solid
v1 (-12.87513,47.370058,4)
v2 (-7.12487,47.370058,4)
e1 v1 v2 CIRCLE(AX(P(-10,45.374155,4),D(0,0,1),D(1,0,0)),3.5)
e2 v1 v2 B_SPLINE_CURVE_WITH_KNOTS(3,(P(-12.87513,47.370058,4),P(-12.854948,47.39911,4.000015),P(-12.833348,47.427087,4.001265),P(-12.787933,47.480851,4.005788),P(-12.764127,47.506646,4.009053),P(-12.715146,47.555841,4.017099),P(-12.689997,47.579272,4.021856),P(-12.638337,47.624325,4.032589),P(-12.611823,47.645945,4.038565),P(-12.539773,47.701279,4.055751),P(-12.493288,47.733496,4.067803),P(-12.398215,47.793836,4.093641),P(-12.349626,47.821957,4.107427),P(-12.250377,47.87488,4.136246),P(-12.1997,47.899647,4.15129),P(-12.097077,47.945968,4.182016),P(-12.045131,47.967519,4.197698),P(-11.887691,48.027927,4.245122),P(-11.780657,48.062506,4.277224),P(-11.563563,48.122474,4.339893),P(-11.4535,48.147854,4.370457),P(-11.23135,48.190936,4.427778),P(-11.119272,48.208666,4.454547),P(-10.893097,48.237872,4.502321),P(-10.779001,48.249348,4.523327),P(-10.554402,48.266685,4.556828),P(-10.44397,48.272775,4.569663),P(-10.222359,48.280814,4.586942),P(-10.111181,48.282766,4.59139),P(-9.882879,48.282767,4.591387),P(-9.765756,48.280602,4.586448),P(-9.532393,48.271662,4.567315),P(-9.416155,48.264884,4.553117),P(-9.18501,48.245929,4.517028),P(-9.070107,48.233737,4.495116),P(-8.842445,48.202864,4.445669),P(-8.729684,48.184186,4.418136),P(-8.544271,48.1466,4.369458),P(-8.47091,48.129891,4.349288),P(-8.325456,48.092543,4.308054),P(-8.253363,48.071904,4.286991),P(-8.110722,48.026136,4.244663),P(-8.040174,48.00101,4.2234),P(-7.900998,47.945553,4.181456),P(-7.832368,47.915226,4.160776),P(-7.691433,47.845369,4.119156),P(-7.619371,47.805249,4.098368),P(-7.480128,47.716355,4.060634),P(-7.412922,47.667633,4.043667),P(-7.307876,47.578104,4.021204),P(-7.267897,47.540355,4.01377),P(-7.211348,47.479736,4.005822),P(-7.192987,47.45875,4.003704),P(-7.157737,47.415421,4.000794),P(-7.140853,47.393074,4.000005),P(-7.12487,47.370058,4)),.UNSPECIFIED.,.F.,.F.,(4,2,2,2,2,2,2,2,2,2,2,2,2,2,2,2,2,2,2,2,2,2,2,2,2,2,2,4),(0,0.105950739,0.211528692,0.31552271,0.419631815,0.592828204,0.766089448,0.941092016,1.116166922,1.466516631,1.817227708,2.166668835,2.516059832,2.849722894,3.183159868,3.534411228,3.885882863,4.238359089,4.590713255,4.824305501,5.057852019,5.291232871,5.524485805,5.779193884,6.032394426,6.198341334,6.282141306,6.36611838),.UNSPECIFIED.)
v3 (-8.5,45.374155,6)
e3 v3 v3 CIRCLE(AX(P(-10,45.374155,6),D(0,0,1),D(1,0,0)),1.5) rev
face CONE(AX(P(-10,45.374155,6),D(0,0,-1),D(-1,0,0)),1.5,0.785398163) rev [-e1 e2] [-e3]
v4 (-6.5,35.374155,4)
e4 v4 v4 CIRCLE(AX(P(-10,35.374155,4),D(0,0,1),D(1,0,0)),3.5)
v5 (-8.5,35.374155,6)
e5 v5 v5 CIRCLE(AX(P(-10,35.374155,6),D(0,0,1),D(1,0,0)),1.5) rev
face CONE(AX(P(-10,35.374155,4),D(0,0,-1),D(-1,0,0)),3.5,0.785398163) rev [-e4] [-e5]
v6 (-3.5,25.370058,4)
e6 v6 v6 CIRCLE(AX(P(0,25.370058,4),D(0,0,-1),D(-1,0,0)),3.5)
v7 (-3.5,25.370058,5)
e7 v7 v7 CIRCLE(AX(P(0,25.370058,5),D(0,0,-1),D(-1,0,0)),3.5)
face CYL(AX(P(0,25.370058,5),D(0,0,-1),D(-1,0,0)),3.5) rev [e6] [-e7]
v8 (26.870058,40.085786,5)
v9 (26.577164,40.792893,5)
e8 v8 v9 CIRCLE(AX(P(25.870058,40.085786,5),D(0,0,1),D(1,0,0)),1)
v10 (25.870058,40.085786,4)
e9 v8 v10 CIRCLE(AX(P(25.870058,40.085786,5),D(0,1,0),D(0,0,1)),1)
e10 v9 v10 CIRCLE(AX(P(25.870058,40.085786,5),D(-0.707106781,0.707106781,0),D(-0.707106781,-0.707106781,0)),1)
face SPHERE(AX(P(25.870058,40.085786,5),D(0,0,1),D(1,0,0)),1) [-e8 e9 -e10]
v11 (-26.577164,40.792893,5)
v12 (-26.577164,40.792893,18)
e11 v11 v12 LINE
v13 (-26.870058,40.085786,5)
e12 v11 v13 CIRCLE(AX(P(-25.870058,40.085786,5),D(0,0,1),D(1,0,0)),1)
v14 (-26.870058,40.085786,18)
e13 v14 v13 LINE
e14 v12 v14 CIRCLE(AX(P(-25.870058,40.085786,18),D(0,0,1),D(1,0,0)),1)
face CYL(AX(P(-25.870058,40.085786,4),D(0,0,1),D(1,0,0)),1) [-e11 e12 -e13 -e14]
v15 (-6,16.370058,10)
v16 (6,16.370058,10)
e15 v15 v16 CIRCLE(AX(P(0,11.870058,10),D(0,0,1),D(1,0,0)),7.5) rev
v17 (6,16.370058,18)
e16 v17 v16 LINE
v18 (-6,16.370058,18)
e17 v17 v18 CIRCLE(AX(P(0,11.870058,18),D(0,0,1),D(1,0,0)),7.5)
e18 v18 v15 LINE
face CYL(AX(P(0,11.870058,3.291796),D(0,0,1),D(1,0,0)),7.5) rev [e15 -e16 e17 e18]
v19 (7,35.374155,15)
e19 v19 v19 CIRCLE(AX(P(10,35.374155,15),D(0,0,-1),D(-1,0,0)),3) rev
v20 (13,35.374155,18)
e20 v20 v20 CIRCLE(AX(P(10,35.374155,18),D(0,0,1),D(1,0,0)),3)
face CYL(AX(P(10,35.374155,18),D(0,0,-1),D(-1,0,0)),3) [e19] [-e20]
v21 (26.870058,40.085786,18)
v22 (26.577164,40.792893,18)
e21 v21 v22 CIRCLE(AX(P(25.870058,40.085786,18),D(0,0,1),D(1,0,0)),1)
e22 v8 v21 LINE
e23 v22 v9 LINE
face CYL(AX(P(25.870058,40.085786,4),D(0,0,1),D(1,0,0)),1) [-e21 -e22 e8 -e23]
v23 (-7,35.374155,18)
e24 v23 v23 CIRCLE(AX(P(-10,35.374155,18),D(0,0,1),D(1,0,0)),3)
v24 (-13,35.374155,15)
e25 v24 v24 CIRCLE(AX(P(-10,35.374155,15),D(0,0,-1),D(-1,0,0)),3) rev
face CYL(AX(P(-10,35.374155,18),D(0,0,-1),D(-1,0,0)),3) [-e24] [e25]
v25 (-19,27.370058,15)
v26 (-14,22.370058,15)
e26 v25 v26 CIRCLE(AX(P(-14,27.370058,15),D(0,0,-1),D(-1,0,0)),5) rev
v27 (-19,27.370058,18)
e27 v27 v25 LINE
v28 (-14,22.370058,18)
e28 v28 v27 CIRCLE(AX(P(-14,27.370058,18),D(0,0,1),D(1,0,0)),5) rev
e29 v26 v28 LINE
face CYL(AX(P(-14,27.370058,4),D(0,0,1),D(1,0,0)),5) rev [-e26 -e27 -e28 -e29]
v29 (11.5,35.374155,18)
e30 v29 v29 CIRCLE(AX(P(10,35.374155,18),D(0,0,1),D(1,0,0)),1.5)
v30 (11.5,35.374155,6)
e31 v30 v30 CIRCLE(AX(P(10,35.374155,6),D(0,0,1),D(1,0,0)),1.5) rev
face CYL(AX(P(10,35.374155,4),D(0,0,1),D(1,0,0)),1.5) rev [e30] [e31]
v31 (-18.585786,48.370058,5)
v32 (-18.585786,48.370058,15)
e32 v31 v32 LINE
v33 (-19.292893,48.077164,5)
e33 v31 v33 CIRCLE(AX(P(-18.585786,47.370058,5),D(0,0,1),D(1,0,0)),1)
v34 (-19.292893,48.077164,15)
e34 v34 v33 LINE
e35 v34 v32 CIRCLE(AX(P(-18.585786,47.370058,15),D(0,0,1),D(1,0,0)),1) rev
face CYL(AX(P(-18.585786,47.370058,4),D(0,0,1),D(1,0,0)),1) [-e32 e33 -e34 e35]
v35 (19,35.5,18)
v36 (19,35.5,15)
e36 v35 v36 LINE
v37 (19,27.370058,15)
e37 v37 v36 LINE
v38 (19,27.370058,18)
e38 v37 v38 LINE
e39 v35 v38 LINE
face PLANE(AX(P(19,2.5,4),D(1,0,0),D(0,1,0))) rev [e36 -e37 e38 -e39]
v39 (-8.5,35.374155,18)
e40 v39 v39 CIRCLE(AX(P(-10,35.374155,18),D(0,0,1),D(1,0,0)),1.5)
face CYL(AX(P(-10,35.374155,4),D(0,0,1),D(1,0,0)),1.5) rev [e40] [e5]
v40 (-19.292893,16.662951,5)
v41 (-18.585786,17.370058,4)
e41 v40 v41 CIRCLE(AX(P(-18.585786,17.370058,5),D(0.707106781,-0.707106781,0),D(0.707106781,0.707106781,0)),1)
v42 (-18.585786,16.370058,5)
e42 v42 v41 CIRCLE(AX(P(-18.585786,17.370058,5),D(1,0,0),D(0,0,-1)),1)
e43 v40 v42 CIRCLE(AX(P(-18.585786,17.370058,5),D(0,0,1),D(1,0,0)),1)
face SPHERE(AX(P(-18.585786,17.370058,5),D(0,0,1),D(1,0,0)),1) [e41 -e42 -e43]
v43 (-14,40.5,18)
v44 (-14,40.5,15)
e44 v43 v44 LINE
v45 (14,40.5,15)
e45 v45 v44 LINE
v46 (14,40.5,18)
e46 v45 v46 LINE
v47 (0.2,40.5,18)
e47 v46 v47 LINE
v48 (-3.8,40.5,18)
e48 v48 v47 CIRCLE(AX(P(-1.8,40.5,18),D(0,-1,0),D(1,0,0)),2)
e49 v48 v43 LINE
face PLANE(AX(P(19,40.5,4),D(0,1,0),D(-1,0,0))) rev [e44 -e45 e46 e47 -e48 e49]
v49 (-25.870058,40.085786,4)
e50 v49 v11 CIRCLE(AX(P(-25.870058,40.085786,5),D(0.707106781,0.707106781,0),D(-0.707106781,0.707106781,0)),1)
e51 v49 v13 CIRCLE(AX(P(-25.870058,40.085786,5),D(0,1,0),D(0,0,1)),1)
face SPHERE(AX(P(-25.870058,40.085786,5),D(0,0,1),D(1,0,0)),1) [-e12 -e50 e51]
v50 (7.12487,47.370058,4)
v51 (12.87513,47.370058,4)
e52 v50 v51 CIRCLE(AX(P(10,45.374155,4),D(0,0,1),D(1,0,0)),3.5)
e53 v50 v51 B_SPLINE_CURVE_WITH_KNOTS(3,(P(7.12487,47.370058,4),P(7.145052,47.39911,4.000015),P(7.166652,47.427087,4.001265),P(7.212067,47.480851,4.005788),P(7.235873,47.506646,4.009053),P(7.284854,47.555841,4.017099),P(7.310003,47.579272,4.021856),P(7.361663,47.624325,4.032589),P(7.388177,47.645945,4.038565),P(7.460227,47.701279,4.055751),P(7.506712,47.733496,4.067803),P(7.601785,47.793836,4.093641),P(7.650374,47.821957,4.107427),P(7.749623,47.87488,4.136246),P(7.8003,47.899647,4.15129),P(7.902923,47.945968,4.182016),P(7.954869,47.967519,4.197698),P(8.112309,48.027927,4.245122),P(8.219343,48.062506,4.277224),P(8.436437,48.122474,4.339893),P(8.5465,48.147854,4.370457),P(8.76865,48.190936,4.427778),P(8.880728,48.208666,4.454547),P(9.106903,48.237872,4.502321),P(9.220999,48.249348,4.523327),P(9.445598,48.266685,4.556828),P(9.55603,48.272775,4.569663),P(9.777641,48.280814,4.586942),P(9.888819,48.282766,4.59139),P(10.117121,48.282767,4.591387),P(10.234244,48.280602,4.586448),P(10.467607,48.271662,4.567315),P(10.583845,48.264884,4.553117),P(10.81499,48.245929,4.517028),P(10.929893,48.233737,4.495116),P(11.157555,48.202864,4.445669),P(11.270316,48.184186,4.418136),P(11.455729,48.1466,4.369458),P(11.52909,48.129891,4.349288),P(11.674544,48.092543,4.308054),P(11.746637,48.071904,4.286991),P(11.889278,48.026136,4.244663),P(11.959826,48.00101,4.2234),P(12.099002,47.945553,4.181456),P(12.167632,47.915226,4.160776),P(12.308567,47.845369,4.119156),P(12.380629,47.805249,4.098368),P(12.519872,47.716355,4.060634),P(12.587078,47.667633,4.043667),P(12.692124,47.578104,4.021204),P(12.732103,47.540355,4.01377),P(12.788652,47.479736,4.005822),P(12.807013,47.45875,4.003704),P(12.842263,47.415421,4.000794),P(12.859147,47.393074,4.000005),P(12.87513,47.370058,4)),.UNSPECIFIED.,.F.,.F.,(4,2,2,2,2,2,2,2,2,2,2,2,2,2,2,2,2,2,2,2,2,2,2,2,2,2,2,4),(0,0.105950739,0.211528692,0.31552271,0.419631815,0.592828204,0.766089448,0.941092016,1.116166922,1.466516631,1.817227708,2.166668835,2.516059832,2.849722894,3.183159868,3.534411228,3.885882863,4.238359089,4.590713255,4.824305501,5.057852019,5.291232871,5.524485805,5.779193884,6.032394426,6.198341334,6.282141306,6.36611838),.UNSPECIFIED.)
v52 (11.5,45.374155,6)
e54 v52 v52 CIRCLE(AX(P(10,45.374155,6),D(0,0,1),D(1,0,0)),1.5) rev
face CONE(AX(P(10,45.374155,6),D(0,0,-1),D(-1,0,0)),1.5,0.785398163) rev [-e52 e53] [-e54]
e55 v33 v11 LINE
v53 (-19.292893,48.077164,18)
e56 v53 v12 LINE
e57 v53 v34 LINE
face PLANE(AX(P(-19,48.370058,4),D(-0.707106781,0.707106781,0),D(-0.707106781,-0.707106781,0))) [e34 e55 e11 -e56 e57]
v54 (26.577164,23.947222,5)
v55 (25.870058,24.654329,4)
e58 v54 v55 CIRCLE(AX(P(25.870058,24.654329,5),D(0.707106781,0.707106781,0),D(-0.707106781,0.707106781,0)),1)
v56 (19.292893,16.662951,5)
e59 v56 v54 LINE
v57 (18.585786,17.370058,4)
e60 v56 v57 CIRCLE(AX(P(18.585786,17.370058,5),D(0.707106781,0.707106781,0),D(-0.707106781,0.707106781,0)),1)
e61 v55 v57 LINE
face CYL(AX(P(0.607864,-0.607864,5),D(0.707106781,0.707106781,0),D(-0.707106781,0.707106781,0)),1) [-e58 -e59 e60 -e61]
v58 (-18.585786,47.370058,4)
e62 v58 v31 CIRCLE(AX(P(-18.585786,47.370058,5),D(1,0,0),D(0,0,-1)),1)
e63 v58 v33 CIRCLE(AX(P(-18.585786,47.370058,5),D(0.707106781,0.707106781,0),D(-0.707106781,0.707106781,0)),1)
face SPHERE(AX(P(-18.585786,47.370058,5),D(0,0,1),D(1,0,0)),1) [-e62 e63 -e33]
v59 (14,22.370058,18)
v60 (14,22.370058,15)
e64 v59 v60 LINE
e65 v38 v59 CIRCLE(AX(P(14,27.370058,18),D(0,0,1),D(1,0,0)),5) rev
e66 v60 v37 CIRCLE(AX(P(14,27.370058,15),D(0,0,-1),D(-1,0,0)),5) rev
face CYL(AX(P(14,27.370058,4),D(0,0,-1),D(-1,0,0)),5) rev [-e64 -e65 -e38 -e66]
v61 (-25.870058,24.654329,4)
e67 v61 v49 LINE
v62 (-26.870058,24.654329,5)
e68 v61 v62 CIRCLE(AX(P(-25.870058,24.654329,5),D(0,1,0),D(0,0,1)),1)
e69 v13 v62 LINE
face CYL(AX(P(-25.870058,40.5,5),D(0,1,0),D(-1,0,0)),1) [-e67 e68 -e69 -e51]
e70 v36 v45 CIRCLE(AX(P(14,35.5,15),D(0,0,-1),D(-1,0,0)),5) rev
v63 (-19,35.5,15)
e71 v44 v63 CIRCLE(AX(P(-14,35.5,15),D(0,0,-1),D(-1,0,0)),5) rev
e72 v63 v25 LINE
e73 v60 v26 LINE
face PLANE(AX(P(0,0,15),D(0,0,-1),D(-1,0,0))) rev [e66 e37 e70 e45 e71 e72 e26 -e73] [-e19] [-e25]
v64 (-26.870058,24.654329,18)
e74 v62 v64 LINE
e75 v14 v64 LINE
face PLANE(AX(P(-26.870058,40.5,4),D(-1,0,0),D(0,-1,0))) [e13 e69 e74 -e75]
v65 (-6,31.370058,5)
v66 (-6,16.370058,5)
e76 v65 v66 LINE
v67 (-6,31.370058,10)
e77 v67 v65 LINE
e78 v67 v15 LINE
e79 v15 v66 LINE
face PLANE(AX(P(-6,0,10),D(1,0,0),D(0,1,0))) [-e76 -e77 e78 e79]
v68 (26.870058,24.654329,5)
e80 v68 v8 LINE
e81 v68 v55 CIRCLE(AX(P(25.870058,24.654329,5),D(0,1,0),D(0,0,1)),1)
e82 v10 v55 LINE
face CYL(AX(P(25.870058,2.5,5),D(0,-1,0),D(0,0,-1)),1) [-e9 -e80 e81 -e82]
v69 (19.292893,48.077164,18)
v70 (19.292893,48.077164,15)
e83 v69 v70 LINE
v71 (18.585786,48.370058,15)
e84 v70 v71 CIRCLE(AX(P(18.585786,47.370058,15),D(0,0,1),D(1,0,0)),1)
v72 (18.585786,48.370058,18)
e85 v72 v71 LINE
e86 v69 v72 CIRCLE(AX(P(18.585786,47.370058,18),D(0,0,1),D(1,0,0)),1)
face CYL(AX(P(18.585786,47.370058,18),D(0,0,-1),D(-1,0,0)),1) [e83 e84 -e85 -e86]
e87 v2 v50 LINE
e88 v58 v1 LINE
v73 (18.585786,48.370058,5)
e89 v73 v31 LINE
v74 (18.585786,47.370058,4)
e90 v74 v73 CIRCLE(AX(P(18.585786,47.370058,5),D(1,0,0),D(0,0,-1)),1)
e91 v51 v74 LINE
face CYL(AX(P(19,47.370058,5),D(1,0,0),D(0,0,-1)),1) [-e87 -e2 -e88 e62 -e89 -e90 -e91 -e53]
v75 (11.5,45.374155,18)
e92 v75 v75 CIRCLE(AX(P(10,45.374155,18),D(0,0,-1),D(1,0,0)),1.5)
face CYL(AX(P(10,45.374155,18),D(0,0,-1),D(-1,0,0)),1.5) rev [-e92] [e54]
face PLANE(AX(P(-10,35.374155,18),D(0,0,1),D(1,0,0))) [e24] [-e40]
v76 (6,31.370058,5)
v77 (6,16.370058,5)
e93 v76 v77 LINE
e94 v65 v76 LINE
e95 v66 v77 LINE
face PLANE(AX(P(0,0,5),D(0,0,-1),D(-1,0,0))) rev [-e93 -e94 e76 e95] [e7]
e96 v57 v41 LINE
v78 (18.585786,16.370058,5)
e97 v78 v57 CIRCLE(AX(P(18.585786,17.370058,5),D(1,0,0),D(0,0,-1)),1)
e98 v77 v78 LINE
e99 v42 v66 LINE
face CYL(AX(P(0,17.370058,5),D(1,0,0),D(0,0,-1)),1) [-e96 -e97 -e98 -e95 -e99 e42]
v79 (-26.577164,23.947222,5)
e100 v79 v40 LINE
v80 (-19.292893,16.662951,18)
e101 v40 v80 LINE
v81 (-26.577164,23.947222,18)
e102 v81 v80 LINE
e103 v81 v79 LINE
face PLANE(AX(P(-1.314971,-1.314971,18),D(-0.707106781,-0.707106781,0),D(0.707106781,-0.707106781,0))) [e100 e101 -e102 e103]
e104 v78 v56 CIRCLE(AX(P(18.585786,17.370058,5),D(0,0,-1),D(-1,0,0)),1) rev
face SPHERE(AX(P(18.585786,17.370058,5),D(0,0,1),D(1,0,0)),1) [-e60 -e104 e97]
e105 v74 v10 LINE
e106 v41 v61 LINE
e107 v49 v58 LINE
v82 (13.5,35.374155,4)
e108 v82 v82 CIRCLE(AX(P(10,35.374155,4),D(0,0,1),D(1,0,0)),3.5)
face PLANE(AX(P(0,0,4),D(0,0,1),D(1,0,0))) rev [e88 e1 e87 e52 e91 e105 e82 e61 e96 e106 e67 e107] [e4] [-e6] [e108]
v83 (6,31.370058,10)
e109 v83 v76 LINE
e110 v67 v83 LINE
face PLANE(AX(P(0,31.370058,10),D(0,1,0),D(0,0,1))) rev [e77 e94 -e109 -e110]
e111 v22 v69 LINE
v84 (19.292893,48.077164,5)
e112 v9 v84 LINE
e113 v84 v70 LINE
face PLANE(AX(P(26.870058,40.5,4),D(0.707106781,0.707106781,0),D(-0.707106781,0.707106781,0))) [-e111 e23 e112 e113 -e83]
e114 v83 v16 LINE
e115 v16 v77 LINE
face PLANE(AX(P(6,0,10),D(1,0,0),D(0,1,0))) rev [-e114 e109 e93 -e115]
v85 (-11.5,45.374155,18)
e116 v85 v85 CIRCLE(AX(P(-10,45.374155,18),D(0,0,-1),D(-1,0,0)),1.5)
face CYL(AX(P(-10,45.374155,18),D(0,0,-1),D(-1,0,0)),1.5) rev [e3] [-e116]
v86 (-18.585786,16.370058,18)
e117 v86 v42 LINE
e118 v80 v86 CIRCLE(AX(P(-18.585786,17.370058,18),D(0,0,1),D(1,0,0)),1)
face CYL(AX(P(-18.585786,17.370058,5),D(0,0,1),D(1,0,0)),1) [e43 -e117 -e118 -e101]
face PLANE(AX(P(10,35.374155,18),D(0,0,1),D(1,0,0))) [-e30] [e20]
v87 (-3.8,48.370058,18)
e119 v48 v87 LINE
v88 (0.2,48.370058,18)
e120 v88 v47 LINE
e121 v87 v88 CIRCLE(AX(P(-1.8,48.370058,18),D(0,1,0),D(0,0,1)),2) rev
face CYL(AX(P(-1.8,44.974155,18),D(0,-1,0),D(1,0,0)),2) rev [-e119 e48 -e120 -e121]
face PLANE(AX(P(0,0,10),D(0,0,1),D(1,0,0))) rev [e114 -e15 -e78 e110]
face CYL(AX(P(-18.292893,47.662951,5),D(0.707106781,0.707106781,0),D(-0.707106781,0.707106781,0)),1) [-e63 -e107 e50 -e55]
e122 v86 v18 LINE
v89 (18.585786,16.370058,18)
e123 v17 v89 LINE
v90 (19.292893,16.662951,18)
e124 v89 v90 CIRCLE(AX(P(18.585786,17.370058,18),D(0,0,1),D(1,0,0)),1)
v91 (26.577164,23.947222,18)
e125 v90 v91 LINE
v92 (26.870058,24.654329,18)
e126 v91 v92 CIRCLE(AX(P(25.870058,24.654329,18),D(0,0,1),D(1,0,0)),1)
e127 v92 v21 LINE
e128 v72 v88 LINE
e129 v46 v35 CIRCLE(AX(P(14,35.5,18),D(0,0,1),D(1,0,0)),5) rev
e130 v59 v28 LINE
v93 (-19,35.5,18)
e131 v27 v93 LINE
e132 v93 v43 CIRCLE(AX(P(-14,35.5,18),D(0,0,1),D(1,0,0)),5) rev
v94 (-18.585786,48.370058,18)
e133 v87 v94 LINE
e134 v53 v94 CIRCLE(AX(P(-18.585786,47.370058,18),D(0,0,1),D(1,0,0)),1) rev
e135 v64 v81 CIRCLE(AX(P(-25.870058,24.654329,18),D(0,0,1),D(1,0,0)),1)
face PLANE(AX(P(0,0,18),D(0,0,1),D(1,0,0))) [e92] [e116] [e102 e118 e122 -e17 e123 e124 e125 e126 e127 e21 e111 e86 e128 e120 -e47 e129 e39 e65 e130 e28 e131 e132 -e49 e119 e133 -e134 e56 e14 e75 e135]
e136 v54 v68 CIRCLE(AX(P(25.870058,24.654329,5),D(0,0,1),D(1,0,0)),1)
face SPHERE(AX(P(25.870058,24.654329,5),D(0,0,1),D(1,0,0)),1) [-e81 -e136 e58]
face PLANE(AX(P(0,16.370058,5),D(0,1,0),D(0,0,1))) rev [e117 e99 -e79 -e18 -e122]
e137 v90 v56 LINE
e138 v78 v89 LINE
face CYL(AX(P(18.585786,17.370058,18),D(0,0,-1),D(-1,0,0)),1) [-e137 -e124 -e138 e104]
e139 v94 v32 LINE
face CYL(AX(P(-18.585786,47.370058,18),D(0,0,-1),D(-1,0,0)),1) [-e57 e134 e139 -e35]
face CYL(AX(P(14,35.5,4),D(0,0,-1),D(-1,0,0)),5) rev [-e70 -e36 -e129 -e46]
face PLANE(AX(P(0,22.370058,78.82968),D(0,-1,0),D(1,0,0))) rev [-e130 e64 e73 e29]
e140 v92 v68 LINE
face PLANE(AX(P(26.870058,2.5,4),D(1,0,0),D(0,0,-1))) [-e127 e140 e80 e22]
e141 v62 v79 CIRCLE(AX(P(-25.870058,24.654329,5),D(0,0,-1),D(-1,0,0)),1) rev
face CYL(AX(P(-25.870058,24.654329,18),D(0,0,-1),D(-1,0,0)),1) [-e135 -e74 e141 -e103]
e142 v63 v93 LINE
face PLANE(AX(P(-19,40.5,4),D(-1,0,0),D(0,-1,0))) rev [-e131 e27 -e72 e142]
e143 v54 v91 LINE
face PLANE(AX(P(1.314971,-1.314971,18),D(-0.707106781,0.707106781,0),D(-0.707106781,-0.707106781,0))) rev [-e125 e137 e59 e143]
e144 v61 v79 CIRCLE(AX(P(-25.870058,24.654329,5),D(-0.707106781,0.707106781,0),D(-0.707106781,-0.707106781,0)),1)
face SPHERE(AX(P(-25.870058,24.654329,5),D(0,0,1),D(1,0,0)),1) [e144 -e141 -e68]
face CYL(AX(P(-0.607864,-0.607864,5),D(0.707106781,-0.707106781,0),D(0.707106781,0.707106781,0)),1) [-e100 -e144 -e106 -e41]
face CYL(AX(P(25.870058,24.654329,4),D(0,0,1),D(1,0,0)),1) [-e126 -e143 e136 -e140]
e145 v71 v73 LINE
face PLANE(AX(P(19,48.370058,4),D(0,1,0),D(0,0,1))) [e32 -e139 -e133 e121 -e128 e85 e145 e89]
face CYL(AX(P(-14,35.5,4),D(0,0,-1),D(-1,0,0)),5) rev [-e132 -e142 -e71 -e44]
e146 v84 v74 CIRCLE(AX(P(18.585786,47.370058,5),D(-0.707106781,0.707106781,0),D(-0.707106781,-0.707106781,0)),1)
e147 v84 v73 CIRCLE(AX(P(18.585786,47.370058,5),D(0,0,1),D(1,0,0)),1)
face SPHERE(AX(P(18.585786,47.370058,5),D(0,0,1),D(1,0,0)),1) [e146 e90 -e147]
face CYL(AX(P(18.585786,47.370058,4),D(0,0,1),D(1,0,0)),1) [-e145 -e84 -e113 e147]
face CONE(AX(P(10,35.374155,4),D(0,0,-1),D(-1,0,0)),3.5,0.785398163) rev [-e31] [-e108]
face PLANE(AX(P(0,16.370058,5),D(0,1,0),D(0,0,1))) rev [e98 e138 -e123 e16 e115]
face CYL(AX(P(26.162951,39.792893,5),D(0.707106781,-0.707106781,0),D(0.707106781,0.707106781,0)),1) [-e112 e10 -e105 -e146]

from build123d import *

# Parameters (mm, degrees)
CROQUIS3_W                   = 38
CROQUIS3_H                   = 38
SALIENTE_EXTRUIR9_DEPTH      = 1
SALIENTE_EXTRUIR10_START     = -11
SALIENTE_EXTRUIR10_OUTLINE_W = 38
SALIENTE_EXTRUIR10_OUTLINE_H = 38
SALIENTE_EXTRUIR10_DEPTH     = 10
CROQUIS13_W                  = 38
CROQUIS13_H                  = 38
SALIENTE_EXTRUIR15_DEPTH     = 3
CROQUIS14_R                  = 1.5
CORTAR_EXTRUIR1_DEPTH        = 14
CROQUIS15_W                  = 38
CROQUIS15_H                  = 24.129942315
CROQUIS15_R                  = 3.5
SALIENTE_EXTRUIR16_DEPTH     = 1
CORTAR_EXTRUIR2_DEPTH        = 14
SALIENTE_EXTRUIR17_DEPTH     = 5
SALIENTE_EXTRUIR18_DEPTH     = 5
CORTAR_EXTRUIR3_DEPTH        = 3
REDONDEO11_R                 = 1
CROQUIS21_R                  = 1.5
CORTAR_EXTRUIR4_DEPTH        = 11
SALIENTE_EXTRUIR20_START     = 3
CROQUIS22_R                  = 3
CROQUIS22_R_2                = 1.5
SALIENTE_EXTRUIR20_DEPTH     = 3
CHAFL_N1_SIZE                = 2
REDONDEO12_R                 = 1
REDONDEO13_R                 = 1
SALIENTE_EXTRUIR22_DEPTH     = 3
REDONDEO14_R                 = 5
SALIENTE_EXTRUIR23_DEPTH     = 8


# Read off the part's stored shape, not the designer's step: Saliente-Extruir10
with BuildPart() as part:
    # Croquis3 → Saliente-Extruir9 (new body)
    with BuildSketch(Plane.XY.offset(5)):
        Polygon((19, -5.370057685), (26.870057685, 2.5), (26.870057685, 40.5), (19, 48.370057685), (-19, 48.370057685), (-26.870057685, 40.5), (-26.870057685, 2.5), (-19, -5.370057685), align=None)
        with Locations((0, 21.5)):
            Rectangle(CROQUIS3_W, CROQUIS3_H, mode=Mode.SUBTRACT)
    extrude(amount=-SALIENTE_EXTRUIR9_DEPTH)

    # Saliente-Extruir10 outline → Saliente-Extruir10 (add)
    with BuildSketch(Plane(origin=(0, 0, 4), x_dir=(-1, 0, 0), z_dir=(0, 0, -1)).offset(SALIENTE_EXTRUIR10_START)):
        Polygon((-26.870057685, 2.5), (-19, -5.370057685), (19, -5.370057685), (26.870057685, 2.5), (26.870057685, 40.5), (19, 48.370057685), (-19, 48.370057685), (-26.870057685, 40.5), align=None)
        with Locations((0, 21.5)):
            Rectangle(SALIENTE_EXTRUIR10_OUTLINE_W, SALIENTE_EXTRUIR10_OUTLINE_H, mode=Mode.SUBTRACT)
    extrude(amount=SALIENTE_EXTRUIR10_DEPTH)

    # Croquis13 → Saliente-Extruir15 (add)
    with BuildSketch(Plane.XY.offset(15)):
        with BuildLine():
            Line((-22.5, 44.870057685), (-22.5, -1))
            Line((-22.5, -1), (22.5, -1))
            Line((22.5, -1), (22.5, 44.870057685))
            Line((22.5, 44.870057685), (19.292893219, 48.077164466))
            ThreePointArc((19.292893219, 48.077164466), (18.96846987, 48.293937218), (18.585786438, 48.370057685))
            Line((18.585786438, 48.370057685), (-18.585786438, 48.370057685))
            ThreePointArc((-18.585786438, 48.370057685), (-18.96846987, 48.293937218), (-19.292893219, 48.077164466))
            Line((-19.292893219, 48.077164466), (-22.5, 44.870057685))
        make_face()
        with Locations((0, 21.5)):
            Rectangle(CROQUIS13_W, CROQUIS13_H, mode=Mode.SUBTRACT)
    extrude(amount=SALIENTE_EXTRUIR15_DEPTH)

    # Croquis14 → Cortar-Extruir1 (cut)
    with BuildSketch(Plane(origin=(0, 0, 4), x_dir=(-1, 0, 0), z_dir=(0, 0, -1))):
        with Locations((10, 45.37415474)):
            Circle(CROQUIS14_R)
        with Locations(Location((-10, 45.37415474, 0), (0, 0, 180))):
            Circle(CROQUIS14_R)
    extrude(amount=-CORTAR_EXTRUIR1_DEPTH, mode=Mode.SUBTRACT)

    # Croquis15 → Saliente-Extruir16 (add)
    with BuildSketch(Plane(origin=(0, 0, 4), x_dir=(-1, 0, 0), z_dir=(0, 0, -1))):
        with Locations((0, 28.435028843)):
            Rectangle(CROQUIS15_W, CROQUIS15_H)
        with Locations((0, 25.370057685)):
            Circle(CROQUIS15_R, mode=Mode.SUBTRACT)
    extrude(amount=-SALIENTE_EXTRUIR16_DEPTH)

    # Croquis16 → Cortar-Extruir2 (cut)
    with BuildSketch(Plane(origin=(0, 0, 4), x_dir=(-1, 0, 0), z_dir=(0, 0, -1))):
        Polygon((-19, 2.5), (-19, 16.370057685), (-26.870057685, 24.24011537), (-26.870057685, 2.5), (-19, -5.370057685), (19, -5.370057685), (26.870057685, 2.5), (26.870057685, 24.24011537), (19, 16.370057685), (19, 2.5), align=None)
    extrude(amount=-CORTAR_EXTRUIR2_DEPTH, mode=Mode.SUBTRACT)

    # Croquis17 → Saliente-Extruir17 (add)
    with BuildSketch(Plane.XY.offset(5)):
        Polygon((6, 31.370057685), (6, 25.370057685), (6, 19.370057685), (6, 16.370057685), (19, 16.370057685), (19, 40.5), (-19, 40.5), (-19, 16.370057685), (-6, 16.370057685), (-6, 19.370057685), (-6, 31.370057685), align=None)
    extrude(amount=SALIENTE_EXTRUIR17_DEPTH)

    # Croquis18 → Saliente-Extruir18 (add)
    with BuildSketch(Plane.XY.offset(10)):
        Polygon((-19, 40.5), (-19, 16.370057685), (-6, 16.370057685), (-6, 19.370057685), (6, 19.370057685), (6, 16.370057685), (19, 16.370057685), (19, 40.5), align=None)
    extrude(amount=SALIENTE_EXTRUIR18_DEPTH)

    # Croquis19 → Cortar-Extruir3 (cut)
    with BuildSketch(Plane.XY.offset(18)):
        Polygon((-22.5, 19.870057685), (-19, 16.370057685), (-19, 21.370057685), (-22.5, 21.370057685), align=None)
        Polygon((19, 16.370057685), (22.5, 19.870057685), (22.5, 21.370057685), (19, 21.370057685), align=None)
    extrude(amount=-CORTAR_EXTRUIR3_DEPTH, mode=Mode.SUBTRACT)

    # Redondeo11
    redondeo11_edges = [part.edges().sort_by_distance(p)[0] for p in [
        (26.870057685, 40.5, 10),
        (19, 48.370057685, 10),
        (-19, 48.370057685, 10),
        (-26.870057685, 40.5, 10),
        (26.870057685, 24.24011537, 9.5),
        (19, 16.370057685, 9.5),
        (-26.870057685, 24.24011537, 9.5),
        (-19, 16.370057685, 9.5),
    ]]
    fillet(redondeo11_edges, radius=REDONDEO11_R)

    # Croquis21 → Cortar-Extruir4 (cut)
    with BuildSketch(Plane.XY.offset(15)):
        with Locations((-10, 35.37415474)):
            Circle(CROQUIS21_R)
        with Locations((10, 35.37415474)):
            Circle(CROQUIS21_R)
    extrude(amount=-CORTAR_EXTRUIR4_DEPTH, mode=Mode.SUBTRACT)

    # Croquis22 → Saliente-Extruir20 (add)
    # profile 1 of 2: a face of its own
    with BuildSketch(Plane.XY.offset(15).offset(SALIENTE_EXTRUIR20_START)):
        with Locations(Location((-10, 35.37415474, 0), (0, 0, 180))):
            Circle(CROQUIS22_R)
        with Locations((-10, 35.37415474)):
            Circle(CROQUIS22_R_2, mode=Mode.SUBTRACT)
    # profile 2 of 2: a face of its own
    with BuildSketch(Plane.XY.offset(15).offset(SALIENTE_EXTRUIR20_START)):
        with Locations(Location((10, 35.37415474, 0), (0, 0, 180))):
            Circle(CROQUIS22_R)
        with Locations((10, 35.37415474)):
            Circle(CROQUIS22_R_2, mode=Mode.SUBTRACT)
    extrude(amount=-SALIENTE_EXTRUIR20_DEPTH)

    # Croquis23 → Cortar-Revolución1 (revolve, cut)
    with BuildSketch(Plane.XY.offset(18)):
        Polygon((-1.8, 48.370057685), (-1.8, 44.97415474), (-1.8, 40.5), (0.2, 40.5), (0.2, 48.370057685), align=None)
    revolve(axis=Axis((-1.8, 44.97415474, 18), (0, 1, 0)), mode=Mode.SUBTRACT)

    # Chaflán1
    # the kernel refuses this chamfer: 2 mm, written as the material it takes off along each edge
    with BuildSketch(Plane(origin=(-10, 45.37415474, 4), x_dir=(-1, 0, 0), z_dir=(0, -1, 0))) as chafl_n1_piece_1:
        Polygon((1.5 + CHAFL_N1_SIZE, 0), (1.5, -CHAFL_N1_SIZE), (1.5, 0), align=None)
    revolve(axis=Axis((-10, 45.37415474, 4), (0, 0, -1)), mode=Mode.SUBTRACT)
    with BuildSketch(Plane(origin=(10, 45.37415474, 4), x_dir=(1, 0, 0), z_dir=(0, 1, 0))) as chafl_n1_piece_2:
        Polygon((1.5 + CHAFL_N1_SIZE, 0), (1.5, -CHAFL_N1_SIZE), (1.5, 0), align=None)
    revolve(axis=Axis((10, 45.37415474, 4), (0, 0, -1)), mode=Mode.SUBTRACT)
    with BuildSketch(Plane(origin=(-10, 35.37415474, 4), x_dir=(1, 0, 0), z_dir=(0, -1, 0))) as chafl_n1_piece_3:
        Polygon((1.5 + CHAFL_N1_SIZE, 0), (1.5, CHAFL_N1_SIZE), (1.5, 0), align=None)
    revolve(axis=Axis((-10, 35.37415474, 4), (0, 0, 1)), mode=Mode.SUBTRACT)
    with BuildSketch(Plane(origin=(10, 35.37415474, 4), x_dir=(1, 0, 0), z_dir=(0, -1, 0))) as chafl_n1_piece_4:
        Polygon((1.5 + CHAFL_N1_SIZE, 0), (1.5, CHAFL_N1_SIZE), (1.5, 0), align=None)
    revolve(axis=Axis((10, 35.37415474, 4), (0, 0, 1)), mode=Mode.SUBTRACT)

    # Redondeo12
    # the kernel refuses this fillet: 1 mm, written as the material it takes off along each edge
    with BuildSketch(Plane(origin=(26.870057685, 24.654328933, 4), x_dir=(-1, 0, 0), z_dir=(0, 1, 0)), Plane(origin=(-26.870057685, 40.085786438, 4), x_dir=(1, 0, 0), z_dir=(0, -1, 0))) as redondeo12_piece_1:
        with BuildLine():
            CenterArc((REDONDEO12_R, REDONDEO12_R), REDONDEO12_R, 180, 90)
            Line((0, REDONDEO12_R), (0, 0))
            Line((0, 0), (REDONDEO12_R, 0))
        make_face()
    extrude(amount=15.431457505, mode=Mode.SUBTRACT)
    with BuildSketch(Plane(origin=(26.577164466, 40.792893219, 4), x_dir=(-0.7071067811865461, -0.707106781186549, 0), z_dir=(-0.707106781186549, 0.7071067811865461, 0)), Plane(origin=(-26.577164466, 23.947222151, 4), x_dir=(0.7071067811865487, 0.7071067811865465, 0), z_dir=(0.7071067811865465, -0.7071067811865487, 0)), Plane(origin=(-19.292893219, 48.077164466, 4), x_dir=(0.7071067811865487, -0.7071067811865465, 0), z_dir=(-0.7071067811865465, -0.7071067811865487, 0)), Plane(origin=(19.292893219, 16.662950904, 4), x_dir=(-0.7071067811865485, 0.7071067811865467, 0), z_dir=(0.7071067811865466, 0.7071067811865485, 0))) as redondeo12_piece_2:
        with BuildLine():
            CenterArc((REDONDEO12_R, REDONDEO12_R), REDONDEO12_R, 180, 90)
            Line((0, REDONDEO12_R), (0, 0))
            Line((0, 0), (REDONDEO12_R, 0))
        make_face()
    extrude(amount=10.30151519, mode=Mode.SUBTRACT)
    with BuildSketch(Plane(origin=(18.585786438, 48.370057685, 4), x_dir=(0, -1, 0), z_dir=(-1, 0, 0)), Plane(origin=(-9.309576067, 48.370057685, 4), x_dir=(0, -1, 0), z_dir=(-1, 0, 0))) as redondeo12_piece_3:
        with BuildLine():
            CenterArc((REDONDEO12_R, REDONDEO12_R), REDONDEO12_R, 180, 90)
            Line((0, REDONDEO12_R), (0, 0))
            Line((0, 0), (REDONDEO12_R, 0))
        make_face()
    extrude(amount=9.276210371, mode=Mode.SUBTRACT)
    with BuildSketch(Plane(origin=(18.585786438, 16.370057685, 4), x_dir=(0, 1, 0), z_dir=(-1, 0, 0))) as redondeo12_piece_4:
        with BuildLine():
            CenterArc((REDONDEO12_R, -REDONDEO12_R), REDONDEO12_R, 90, 90)
            Line((0, -REDONDEO12_R), (0, 0))
            Line((0, 0), (REDONDEO12_R, 0))
        make_face()
    extrude(amount=37.171572875, mode=Mode.SUBTRACT)
    with BuildSketch(Plane(origin=(-18.585786438, 17.370057685, 4), x_dir=(-0.7071067811865493, -0.7071067811865458, 0), z_dir=(-0.7071067811865458, 0.7071067811865493, 0))) as redondeo12_piece_5:
        with BuildLine():
            CenterArc((1 - REDONDEO12_R, REDONDEO12_R), REDONDEO12_R, 270, 90)
            Line((1, REDONDEO12_R), (1, 0))
            Line((1, 0), (1 - REDONDEO12_R, 0))
        make_face()
    revolve(axis=Axis((-18.585786438, 17.370057685, 4), (0, 0, 1)), revolution_arc=45, mode=Mode.SUBTRACT)
    with BuildSketch(Plane(origin=(-25.870057685, 24.654328933, 4), x_dir=(-1, 0, 0), z_dir=(0, 1, 0))) as redondeo12_piece_6:
        with BuildLine():
            CenterArc((1 - REDONDEO12_R, REDONDEO12_R), REDONDEO12_R, 270, 90)
            Line((1, REDONDEO12_R), (1, 0))
            Line((1, 0), (1 - REDONDEO12_R, 0))
        make_face()
    revolve(axis=Axis((-25.870057685, 24.654328933, 4), (0, 0, 1)), revolution_arc=45, mode=Mode.SUBTRACT)
    with BuildSketch(Plane(origin=(18.585786438, 17.370057685, 4), x_dir=(0, -1, 0), z_dir=(-1, 0, 0))) as redondeo12_piece_7:
        with BuildLine():
            CenterArc((1 - REDONDEO12_R, REDONDEO12_R), REDONDEO12_R, 270, 90)
            Line((1, REDONDEO12_R), (1, 0))
            Line((1, 0), (1 - REDONDEO12_R, 0))
        make_face()
    revolve(axis=Axis((18.585786438, 17.370057685, 4), (0, 0, 1)), revolution_arc=45, mode=Mode.SUBTRACT)
    with BuildSketch(Plane(origin=(25.870057685, 24.654328933, 4), x_dir=(1, 0, 0), z_dir=(0, 1, 0))) as redondeo12_piece_8:
        with BuildLine():
            CenterArc((1 - REDONDEO12_R, -REDONDEO12_R), REDONDEO12_R, 0, 90)
            Line((1, -REDONDEO12_R), (1, 0))
            Line((1, 0), (1 - REDONDEO12_R, 0))
        make_face()
    revolve(axis=Axis((25.870057685, 24.654328933, 4), (0, 0, -1)), revolution_arc=45, mode=Mode.SUBTRACT)
    with BuildSketch(Plane(origin=(-25.870057685, 40.085786438, 4), x_dir=(-0.7071067811865493, 0.7071067811865458, 0), z_dir=(0.7071067811865458, 0.7071067811865493, 0))) as redondeo12_piece_9:
        with BuildLine():
            CenterArc((1 - REDONDEO12_R, REDONDEO12_R), REDONDEO12_R, 270, 90)
            Line((1, REDONDEO12_R), (1, 0))
            Line((1, 0), (1 - REDONDEO12_R, 0))
        make_face()
    revolve(axis=Axis((-25.870057685, 40.085786438, 4), (0, 0, 1)), revolution_arc=45, mode=Mode.SUBTRACT)
    with BuildSketch(Plane(origin=(-18.585786438, 47.370057685, 4), x_dir=(0, 1, 0), z_dir=(1, 0, 0))) as redondeo12_piece_10:
        with BuildLine():
            CenterArc((1 - REDONDEO12_R, REDONDEO12_R), REDONDEO12_R, 270, 90)
            Line((1, REDONDEO12_R), (1, 0))
            Line((1, 0), (1 - REDONDEO12_R, 0))
        make_face()
    revolve(axis=Axis((-18.585786438, 47.370057685, 4), (0, 0, 1)), revolution_arc=45, mode=Mode.SUBTRACT)
    with BuildSketch(Plane(origin=(18.585786438, 47.370057685, 4), x_dir=(0.7071067811865476, 0.7071067811865476, 0), z_dir=(0.7071067811865476, -0.7071067811865476, 0))) as redondeo12_piece_11:
        with BuildLine():
            CenterArc((1 - REDONDEO12_R, REDONDEO12_R), REDONDEO12_R, 270, 90)
            Line((1, REDONDEO12_R), (1, 0))
            Line((1, 0), (1 - REDONDEO12_R, 0))
        make_face()
    revolve(axis=Axis((18.585786438, 47.370057685, 4), (0, 0, 1)), revolution_arc=45, mode=Mode.SUBTRACT)
    with BuildSketch(Plane(origin=(25.870057685, 40.085786438, 4), x_dir=(1, 0, 0), z_dir=(0, -1, 0))) as redondeo12_piece_12:
        with BuildLine():
            CenterArc((1 - REDONDEO12_R, REDONDEO12_R), REDONDEO12_R, 270, 90)
            Line((1, REDONDEO12_R), (1, 0))
            Line((1, 0), (1 - REDONDEO12_R, 0))
        make_face()
    revolve(axis=Axis((25.870057685, 40.085786438, 4), (0, 0, 1)), revolution_arc=45, mode=Mode.SUBTRACT)
    with BuildSketch(Plane(origin=(10.690423933, 48.370057685, 4), x_dir=(0, -1, 0), z_dir=(-1, 0, 0))) as redondeo12_piece_13:
        with BuildLine():
            CenterArc((REDONDEO12_R, REDONDEO12_R), REDONDEO12_R, 180, 90)
            Line((0, REDONDEO12_R), (0, 0))
            Line((0, 0), (REDONDEO12_R, 0))
        make_face()
    extrude(amount=21.380847867, mode=Mode.SUBTRACT)

    # Redondeo13
    redondeo13_edges = [part.edges().sort_by_distance(p)[0] for p in [
        (22.5, 21.370057685, 16.5),
        (19, 21.370057685, 16.5),
        (-19, 21.370057685, 16.5),
        (-22.5, 21.370057685, 16.5),
    ]]
    fillet(redondeo13_edges, radius=REDONDEO13_R)

    # Croquis26 → Saliente-Extruir22 (add)
    with BuildSketch(Plane.XY.offset(15)):
        with BuildLine():
            Line((19, 22.370057685), (-19, 22.370057685))
            ThreePointArc((-19, 22.370057685), (-19.292893219, 21.662950904), (-20, 21.370057685))
            Line((-20, 21.370057685), (-21.5, 21.370057685))
            ThreePointArc((-21.5, 21.370057685), (-22.207106781, 21.662950904), (-22.5, 22.370057685))
            Line((-22.5, 22.370057685), (-22.5, 44.870057685))
            Line((-22.5, 44.870057685), (-26.577164466, 40.792893219))
            ThreePointArc((-26.577164466, 40.792893219), (-26.793937218, 40.46846987), (-26.870057685, 40.085786438))
            Line((-26.870057685, 40.085786438), (-26.870057685, 24.654328933))
            ThreePointArc((-26.870057685, 24.654328933), (-26.793937218, 24.2716455), (-26.577164466, 23.947222151))
            Line((-26.577164466, 23.947222151), (-19.292893219, 16.662950904))
            ThreePointArc((-19.292893219, 16.662950904), (-18.96846987, 16.446178153), (-18.585786438, 16.370057685))
            Line((-18.585786438, 16.370057685), (-6, 16.370057685))
            Line((-6, 16.370057685), (-6, 19.370057685))
            Line((-6, 19.370057685), (6, 19.370057685))
            Line((6, 19.370057685), (6, 16.370057685))
            Line((6, 16.370057685), (18.585786438, 16.370057685))
            ThreePointArc((18.585786438, 16.370057685), (18.96846987, 16.446178153), (19.292893219, 16.662950904))
            Line((19.292893219, 16.662950904), (26.577164466, 23.947222151))
            ThreePointArc((26.577164466, 23.947222151), (26.793937218, 24.2716455), (26.870057685, 24.654328933))
            Line((26.870057685, 24.654328933), (26.870057685, 40.085786438))
            ThreePointArc((26.870057685, 40.085786438), (26.793937218, 40.46846987), (26.577164466, 40.792893219))
            Line((26.577164466, 40.792893219), (22.5, 44.870057685))
            Line((22.5, 44.870057685), (22.5, 22.370057685))
            ThreePointArc((22.5, 22.370057685), (22.207106781, 21.662950904), (21.5, 21.370057685))
            Line((21.5, 21.370057685), (20, 21.370057685))
            ThreePointArc((20, 21.370057685), (19.292893219, 21.662950904), (19, 22.370057685))
        make_face()
    extrude(amount=SALIENTE_EXTRUIR22_DEPTH)

    # Redondeo14
    redondeo14_edges = [part.edges().sort_by_distance(p)[0] for p in [
        (-19, 40.5, 16.5),
        (19, 40.5, 16.5),
        (19, 22.370057685, 16.5),
        (-19, 22.370057685, 16.5),
    ]]
    fillet(redondeo14_edges, radius=REDONDEO14_R)

    # Croquis27 → Saliente-Extruir23 (add)
    with BuildSketch(Plane.XY.offset(18)):
        with BuildLine():
            ThreePointArc((-6, 16.370057685), (-3.354101966, 18.578261618), (0, 19.370057685))
            Line((0, 19.370057685), (-6, 19.370057685))
            Line((-6, 19.370057685), (-6, 16.370057685))
        make_face()
        with BuildLine():
            ThreePointArc((0, 19.370057685), (3.354101966, 18.578261618), (6, 16.370057685))
            Line((6, 16.370057685), (6, 19.370057685))
            Line((6, 19.370057685), (0, 19.370057685))
        make_face()
    extrude(amount=-SALIENTE_EXTRUIR23_DEPTH)


solid = part.part
